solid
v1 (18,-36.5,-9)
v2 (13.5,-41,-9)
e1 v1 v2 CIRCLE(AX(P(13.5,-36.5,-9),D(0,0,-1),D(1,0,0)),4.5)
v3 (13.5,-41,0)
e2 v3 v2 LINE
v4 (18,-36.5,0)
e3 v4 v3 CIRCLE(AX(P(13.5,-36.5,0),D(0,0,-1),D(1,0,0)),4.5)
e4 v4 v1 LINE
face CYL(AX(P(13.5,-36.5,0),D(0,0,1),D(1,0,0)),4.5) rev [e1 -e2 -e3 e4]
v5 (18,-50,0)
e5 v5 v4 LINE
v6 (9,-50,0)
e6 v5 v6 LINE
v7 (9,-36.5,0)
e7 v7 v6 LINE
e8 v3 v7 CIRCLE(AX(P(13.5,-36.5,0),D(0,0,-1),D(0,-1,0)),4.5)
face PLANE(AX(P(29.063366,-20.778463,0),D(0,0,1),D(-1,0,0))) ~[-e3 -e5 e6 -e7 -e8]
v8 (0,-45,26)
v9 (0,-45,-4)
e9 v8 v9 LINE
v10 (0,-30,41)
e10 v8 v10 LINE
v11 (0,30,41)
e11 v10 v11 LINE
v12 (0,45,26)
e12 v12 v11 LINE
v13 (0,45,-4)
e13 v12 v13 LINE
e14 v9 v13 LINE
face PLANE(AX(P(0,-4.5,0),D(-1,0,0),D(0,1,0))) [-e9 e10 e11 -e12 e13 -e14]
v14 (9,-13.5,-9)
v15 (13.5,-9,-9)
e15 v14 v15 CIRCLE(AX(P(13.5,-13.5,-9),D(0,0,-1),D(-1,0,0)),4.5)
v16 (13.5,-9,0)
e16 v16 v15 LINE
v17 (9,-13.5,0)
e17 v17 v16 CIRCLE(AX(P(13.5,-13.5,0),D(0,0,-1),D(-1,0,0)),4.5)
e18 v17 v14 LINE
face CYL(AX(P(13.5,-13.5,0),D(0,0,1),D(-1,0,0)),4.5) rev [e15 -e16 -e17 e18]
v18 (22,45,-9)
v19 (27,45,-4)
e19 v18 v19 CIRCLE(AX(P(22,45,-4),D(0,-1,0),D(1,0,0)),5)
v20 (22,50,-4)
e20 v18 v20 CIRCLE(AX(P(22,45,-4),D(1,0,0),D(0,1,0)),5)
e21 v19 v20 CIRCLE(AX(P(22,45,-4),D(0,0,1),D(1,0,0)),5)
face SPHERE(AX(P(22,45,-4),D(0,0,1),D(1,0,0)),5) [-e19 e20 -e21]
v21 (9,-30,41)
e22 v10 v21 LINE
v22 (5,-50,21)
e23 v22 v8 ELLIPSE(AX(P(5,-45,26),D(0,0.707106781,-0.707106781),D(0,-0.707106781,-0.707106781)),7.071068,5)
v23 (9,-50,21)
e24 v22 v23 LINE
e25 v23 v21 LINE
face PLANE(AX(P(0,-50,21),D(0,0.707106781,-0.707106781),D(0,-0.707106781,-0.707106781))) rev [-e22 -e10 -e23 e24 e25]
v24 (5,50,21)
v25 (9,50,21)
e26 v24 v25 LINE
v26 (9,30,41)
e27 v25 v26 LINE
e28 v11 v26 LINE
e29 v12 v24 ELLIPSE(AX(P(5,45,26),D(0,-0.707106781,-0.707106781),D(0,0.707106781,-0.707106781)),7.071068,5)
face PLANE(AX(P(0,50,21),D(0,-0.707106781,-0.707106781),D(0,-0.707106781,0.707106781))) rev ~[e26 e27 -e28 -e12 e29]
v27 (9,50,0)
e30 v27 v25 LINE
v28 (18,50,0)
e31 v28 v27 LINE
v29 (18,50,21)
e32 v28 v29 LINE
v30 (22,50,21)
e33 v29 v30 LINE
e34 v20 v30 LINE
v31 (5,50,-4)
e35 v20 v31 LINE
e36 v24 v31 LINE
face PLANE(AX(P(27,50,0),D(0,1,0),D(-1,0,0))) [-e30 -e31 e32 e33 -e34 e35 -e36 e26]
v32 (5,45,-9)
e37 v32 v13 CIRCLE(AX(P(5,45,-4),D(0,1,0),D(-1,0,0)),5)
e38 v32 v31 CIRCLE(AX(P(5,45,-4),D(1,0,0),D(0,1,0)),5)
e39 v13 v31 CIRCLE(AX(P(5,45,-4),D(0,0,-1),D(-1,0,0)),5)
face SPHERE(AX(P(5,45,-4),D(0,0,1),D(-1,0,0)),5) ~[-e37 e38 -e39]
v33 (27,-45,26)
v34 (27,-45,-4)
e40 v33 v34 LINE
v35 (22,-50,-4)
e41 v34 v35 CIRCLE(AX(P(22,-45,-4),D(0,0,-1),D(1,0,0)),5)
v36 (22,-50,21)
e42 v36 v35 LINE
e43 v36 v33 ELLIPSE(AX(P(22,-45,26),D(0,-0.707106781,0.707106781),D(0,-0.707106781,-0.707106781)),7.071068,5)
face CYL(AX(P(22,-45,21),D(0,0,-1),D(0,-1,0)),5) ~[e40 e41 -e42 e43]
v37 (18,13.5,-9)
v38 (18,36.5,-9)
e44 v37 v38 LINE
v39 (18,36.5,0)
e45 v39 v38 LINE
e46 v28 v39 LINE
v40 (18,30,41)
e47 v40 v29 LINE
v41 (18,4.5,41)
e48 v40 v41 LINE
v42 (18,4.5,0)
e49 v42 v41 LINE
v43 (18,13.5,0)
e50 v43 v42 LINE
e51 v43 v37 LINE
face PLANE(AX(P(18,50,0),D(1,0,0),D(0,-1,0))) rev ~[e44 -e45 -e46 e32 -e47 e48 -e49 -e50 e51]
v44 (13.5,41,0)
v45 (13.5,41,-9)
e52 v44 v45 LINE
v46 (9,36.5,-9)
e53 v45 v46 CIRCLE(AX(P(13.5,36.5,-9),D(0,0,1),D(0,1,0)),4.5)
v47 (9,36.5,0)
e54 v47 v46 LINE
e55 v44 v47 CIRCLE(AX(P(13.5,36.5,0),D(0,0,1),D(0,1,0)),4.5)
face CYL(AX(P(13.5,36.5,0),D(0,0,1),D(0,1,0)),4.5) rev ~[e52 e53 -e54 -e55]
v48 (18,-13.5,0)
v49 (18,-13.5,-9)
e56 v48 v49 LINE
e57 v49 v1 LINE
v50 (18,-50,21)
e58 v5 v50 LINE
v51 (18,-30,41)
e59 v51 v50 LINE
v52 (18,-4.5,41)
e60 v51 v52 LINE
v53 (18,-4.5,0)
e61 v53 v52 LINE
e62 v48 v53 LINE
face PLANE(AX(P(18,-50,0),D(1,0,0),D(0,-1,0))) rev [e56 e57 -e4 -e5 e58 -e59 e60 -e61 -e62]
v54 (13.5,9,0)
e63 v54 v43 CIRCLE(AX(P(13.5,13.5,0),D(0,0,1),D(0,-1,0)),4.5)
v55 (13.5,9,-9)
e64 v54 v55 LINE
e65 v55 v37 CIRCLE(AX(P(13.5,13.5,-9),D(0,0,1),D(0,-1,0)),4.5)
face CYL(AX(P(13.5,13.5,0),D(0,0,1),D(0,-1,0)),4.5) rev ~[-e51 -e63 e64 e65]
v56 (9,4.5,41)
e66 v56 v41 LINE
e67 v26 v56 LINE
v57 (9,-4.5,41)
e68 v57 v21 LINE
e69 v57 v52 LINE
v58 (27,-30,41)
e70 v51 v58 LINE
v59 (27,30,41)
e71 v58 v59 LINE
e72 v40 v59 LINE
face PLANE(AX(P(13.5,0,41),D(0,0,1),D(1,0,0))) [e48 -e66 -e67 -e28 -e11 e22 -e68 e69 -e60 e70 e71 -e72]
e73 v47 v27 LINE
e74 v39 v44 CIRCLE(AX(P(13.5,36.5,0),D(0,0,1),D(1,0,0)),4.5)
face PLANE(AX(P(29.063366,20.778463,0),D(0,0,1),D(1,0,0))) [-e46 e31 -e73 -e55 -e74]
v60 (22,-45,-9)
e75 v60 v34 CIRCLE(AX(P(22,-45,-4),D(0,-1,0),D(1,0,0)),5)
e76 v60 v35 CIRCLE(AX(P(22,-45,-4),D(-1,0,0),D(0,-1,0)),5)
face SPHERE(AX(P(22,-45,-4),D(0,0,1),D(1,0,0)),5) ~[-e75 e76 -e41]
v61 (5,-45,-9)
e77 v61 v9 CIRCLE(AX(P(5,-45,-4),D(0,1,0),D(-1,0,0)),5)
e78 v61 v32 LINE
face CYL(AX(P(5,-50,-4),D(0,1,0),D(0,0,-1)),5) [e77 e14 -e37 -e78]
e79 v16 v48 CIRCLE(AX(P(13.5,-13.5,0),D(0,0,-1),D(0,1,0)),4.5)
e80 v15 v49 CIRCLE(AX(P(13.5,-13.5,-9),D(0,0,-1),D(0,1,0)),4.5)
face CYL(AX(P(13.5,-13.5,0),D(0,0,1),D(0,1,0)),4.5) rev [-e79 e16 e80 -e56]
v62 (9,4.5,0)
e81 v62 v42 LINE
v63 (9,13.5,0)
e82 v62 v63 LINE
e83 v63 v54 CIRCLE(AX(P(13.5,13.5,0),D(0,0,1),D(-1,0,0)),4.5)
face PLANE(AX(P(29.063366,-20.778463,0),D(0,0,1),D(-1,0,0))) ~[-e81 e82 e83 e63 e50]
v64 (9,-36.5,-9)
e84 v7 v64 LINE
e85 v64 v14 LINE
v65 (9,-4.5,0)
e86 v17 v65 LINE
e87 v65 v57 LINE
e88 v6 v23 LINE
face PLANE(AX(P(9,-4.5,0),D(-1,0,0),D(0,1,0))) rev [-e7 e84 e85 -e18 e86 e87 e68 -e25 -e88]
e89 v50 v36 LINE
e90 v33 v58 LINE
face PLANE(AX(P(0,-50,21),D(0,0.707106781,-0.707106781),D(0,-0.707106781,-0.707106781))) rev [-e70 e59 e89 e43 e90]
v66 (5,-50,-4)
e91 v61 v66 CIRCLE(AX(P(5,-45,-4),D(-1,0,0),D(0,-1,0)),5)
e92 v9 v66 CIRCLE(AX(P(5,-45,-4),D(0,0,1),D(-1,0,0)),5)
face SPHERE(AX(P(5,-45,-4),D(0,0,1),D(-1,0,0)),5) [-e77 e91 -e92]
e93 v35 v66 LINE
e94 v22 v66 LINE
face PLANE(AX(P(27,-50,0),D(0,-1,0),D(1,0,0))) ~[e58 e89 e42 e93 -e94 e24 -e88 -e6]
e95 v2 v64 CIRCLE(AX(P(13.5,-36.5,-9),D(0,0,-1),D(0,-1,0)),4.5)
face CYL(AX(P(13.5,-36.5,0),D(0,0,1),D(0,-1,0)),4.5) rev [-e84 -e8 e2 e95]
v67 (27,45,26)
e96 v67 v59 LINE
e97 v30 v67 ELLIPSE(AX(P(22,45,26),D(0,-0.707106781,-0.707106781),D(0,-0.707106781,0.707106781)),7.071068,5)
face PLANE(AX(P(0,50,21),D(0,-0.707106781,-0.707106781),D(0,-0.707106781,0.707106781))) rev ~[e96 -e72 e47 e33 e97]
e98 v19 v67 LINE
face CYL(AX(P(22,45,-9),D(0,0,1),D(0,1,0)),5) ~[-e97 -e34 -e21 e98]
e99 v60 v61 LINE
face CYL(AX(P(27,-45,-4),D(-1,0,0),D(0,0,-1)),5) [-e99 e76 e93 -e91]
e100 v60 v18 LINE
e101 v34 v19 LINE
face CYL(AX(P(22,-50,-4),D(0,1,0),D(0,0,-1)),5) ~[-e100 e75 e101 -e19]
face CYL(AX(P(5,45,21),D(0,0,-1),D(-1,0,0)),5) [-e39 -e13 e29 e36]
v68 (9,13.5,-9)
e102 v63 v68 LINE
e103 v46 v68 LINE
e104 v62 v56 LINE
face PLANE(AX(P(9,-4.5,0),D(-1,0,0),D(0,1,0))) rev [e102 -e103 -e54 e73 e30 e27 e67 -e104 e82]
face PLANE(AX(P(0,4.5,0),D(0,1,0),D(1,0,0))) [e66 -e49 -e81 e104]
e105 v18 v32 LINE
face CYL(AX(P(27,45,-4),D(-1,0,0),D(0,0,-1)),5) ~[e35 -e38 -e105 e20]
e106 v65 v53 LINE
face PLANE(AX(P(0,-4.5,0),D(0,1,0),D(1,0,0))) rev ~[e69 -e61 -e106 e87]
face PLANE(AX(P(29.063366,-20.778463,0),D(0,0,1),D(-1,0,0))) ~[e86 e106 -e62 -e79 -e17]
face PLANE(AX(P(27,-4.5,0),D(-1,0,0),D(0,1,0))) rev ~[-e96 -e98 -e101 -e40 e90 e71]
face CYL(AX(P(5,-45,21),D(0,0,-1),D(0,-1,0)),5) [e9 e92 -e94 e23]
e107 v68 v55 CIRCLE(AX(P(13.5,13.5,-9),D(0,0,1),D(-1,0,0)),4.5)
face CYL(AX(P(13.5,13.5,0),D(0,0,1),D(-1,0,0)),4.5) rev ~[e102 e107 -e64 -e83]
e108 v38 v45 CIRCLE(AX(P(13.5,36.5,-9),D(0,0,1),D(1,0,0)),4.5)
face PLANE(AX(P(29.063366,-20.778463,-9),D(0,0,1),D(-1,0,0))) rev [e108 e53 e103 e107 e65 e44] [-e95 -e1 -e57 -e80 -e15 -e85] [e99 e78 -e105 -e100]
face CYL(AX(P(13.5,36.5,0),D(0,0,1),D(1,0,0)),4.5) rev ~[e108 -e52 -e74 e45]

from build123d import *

# Parameters (mm, degrees)
F0_W      = 41
F0_H      = 9
F1_DEPTH  = 41
F3_DEPTH  = 9
F5_DEPTH  = 9
F7_DEPTH  = 30
F9_DEPTH  = 30
F11_DEPTH = 9
F13_DEPTH = 25
F14_R     = 1
F16_W     = 18
F16_H     = 9
F17_DEPTH = 41
F19_DEPTH = 50.001
F20_R     = 5
F21_W     = 9
F21_H     = 41
F22_DEPTH = 30
F23_W     = 27
F23_H     = 9
F24_DEPTH = 41


with BuildPart() as f1:
    # F0 (on Top) → F1 (new body)
    with BuildSketch(Plane.XY):
        Polygon((0, 50), (0, 0), (27, 0), (27, 4.5), (27, 13.5), (27, 22.5), (27, 50), (18, 50), (18, 4.5), (9, 4.5), (9, 50), align=None)
        with Locations((47.5, 9)):
            Rectangle(F0_W, F0_H)
    extrude(amount=F1_DEPTH)

    # F2 (on Top) → F3 (join)
    with BuildSketch(Plane.XY):
        Polygon((0, 50), (0, 0), (68, 0), (68, 13.5), (27, 50), align=None)
    extrude(amount=-F3_DEPTH)

    # F4 (on face) → F5 (cut, through all)
    with BuildSketch(Plane.XY):
        Polygon((56.1775657399, 18), (31.5, 39.9690524269), (31.5, 18), align=None)
    extrude(amount=-F5_DEPTH, mode=Mode.SUBTRACT)

    # F6 (on face) → F7 (cut)
    with BuildSketch(Plane(origin=(0, 0, 0), x_dir=(0, -1, 0), z_dir=(-1, 0, 0))):
        Polygon((-50, 21), (-30, 41), (-50, 41), align=None)
    extrude(amount=-F7_DEPTH, mode=Mode.SUBTRACT)

    # F8 (on face) → F9 (cut)
    with BuildSketch(Plane.XZ):
        Polygon((0, 21), (0, 41), (-20, 41), align=None)
    extrude(amount=-F9_DEPTH, mode=Mode.SUBTRACT)

    # F10 (on face) → F11 (cut, through all)
    with BuildSketch(Plane.XY):
        with BuildLine():
            Line((9, 36.5), (9, 13.5))
            ThreePointArc((9, 13.5), (10.3180194847, 10.3180194847), (13.5, 9))
            ThreePointArc((13.5, 9), (16.6819805153, 10.3180194847), (18, 13.5))
            Line((18, 13.5), (18, 36.5))
            ThreePointArc((18, 36.5), (16.6819805153, 39.6819805153), (13.5, 41))
            ThreePointArc((13.5, 41), (10.3180194847, 39.6819805153), (9, 36.5))
        make_face()
        with BuildLine():
            ThreePointArc((59, 0), (57.6819805153, 3.1819805153), (54.5, 4.5))
            Line((54.5, 4.5), (40.5, 4.5))
            ThreePointArc((40.5, 4.5), (37.3180194847, 3.1819805153), (36, 0))
            Line((36, 0), (59, 0))
        make_face()
    extrude(amount=-F11_DEPTH, mode=Mode.SUBTRACT)

    # F12 (on face) → F13 (cut)
    with BuildSketch(Plane.XZ.offset(-4.5)):
        Polygon((68, 21), (68, 41), (48, 41), align=None)
        Polygon((59, 17.2720779386), (44.2720779386, 32), (36, 32), (36, 9), (59, 9), align=None)
    extrude(amount=-F13_DEPTH, mode=Mode.SUBTRACT)

    # F14
    f14_edges = [f1.edges().sort_by_distance(p)[0] for p in [
        (31.5, 18, -4.5),
        (31.5, 39.969052, -4.5),
        (56.177566, 18, -4.5),
        (36, 9, 9),
        (36, 9, 32),
        (44.272078, 9, 32),
        (59, 9, 17.272078),
        (59, 9, 9),
    ]]
    fillet(f14_edges, radius=F14_R)

    # F15: F1 across face


with BuildPart() as f1_1:
    add(f1.part)
    add(f1.part.mirror(Plane(origin=(14.5188679245, 0, 14.8396226415), x_dir=(1, 0, 0), z_dir=(0, -1, 0))))

    # F16 (on face) → F17 (cut)
    with BuildSketch(Plane.XY.offset(41)):
        with Locations((18, 0)):
            Rectangle(F16_W, F16_H)
    extrude(amount=-F17_DEPTH, mode=Mode.SUBTRACT)

    # F18 (on face) → F19 (cut, through all)
    with BuildSketch(Plane.XY.offset(41)):
        Polygon((27, 70.5021247268), (27, -13.5), (27, -65.4299333692), (95.0682684779, -18.0513188243), (92.9595008492, 35.7407592237), align=None)
    extrude(amount=-F19_DEPTH, mode=Mode.SUBTRACT)

    # F20
    f20_edges = [f1_1.edges().sort_by_distance(p)[0] for p in [
        (27, -50, 6),
        (0, -50, 6),
        (27, 50, 6),
        (0, 50, 6),
        (0, 0, -9),
        (27, 0, -9),
        (13.5, 50, -9),
        (13.5, -50, -9),
    ]]
    fillet(f20_edges, radius=F20_R)

    # F21 (on face) → F22 (cut)
    with BuildSketch(Plane.YZ.offset(27)):
        with Locations((0, 20.5)):
            Rectangle(F21_W, F21_H)
    extrude(amount=-F22_DEPTH, mode=Mode.SUBTRACT)

    # F23 (on face) → F24 (join)
    with BuildSketch(Plane.XY):
        with Locations((13.5, 0)):
            Rectangle(F23_W, F23_H)
    extrude(amount=F24_DEPTH)


solid = f1_1.part
